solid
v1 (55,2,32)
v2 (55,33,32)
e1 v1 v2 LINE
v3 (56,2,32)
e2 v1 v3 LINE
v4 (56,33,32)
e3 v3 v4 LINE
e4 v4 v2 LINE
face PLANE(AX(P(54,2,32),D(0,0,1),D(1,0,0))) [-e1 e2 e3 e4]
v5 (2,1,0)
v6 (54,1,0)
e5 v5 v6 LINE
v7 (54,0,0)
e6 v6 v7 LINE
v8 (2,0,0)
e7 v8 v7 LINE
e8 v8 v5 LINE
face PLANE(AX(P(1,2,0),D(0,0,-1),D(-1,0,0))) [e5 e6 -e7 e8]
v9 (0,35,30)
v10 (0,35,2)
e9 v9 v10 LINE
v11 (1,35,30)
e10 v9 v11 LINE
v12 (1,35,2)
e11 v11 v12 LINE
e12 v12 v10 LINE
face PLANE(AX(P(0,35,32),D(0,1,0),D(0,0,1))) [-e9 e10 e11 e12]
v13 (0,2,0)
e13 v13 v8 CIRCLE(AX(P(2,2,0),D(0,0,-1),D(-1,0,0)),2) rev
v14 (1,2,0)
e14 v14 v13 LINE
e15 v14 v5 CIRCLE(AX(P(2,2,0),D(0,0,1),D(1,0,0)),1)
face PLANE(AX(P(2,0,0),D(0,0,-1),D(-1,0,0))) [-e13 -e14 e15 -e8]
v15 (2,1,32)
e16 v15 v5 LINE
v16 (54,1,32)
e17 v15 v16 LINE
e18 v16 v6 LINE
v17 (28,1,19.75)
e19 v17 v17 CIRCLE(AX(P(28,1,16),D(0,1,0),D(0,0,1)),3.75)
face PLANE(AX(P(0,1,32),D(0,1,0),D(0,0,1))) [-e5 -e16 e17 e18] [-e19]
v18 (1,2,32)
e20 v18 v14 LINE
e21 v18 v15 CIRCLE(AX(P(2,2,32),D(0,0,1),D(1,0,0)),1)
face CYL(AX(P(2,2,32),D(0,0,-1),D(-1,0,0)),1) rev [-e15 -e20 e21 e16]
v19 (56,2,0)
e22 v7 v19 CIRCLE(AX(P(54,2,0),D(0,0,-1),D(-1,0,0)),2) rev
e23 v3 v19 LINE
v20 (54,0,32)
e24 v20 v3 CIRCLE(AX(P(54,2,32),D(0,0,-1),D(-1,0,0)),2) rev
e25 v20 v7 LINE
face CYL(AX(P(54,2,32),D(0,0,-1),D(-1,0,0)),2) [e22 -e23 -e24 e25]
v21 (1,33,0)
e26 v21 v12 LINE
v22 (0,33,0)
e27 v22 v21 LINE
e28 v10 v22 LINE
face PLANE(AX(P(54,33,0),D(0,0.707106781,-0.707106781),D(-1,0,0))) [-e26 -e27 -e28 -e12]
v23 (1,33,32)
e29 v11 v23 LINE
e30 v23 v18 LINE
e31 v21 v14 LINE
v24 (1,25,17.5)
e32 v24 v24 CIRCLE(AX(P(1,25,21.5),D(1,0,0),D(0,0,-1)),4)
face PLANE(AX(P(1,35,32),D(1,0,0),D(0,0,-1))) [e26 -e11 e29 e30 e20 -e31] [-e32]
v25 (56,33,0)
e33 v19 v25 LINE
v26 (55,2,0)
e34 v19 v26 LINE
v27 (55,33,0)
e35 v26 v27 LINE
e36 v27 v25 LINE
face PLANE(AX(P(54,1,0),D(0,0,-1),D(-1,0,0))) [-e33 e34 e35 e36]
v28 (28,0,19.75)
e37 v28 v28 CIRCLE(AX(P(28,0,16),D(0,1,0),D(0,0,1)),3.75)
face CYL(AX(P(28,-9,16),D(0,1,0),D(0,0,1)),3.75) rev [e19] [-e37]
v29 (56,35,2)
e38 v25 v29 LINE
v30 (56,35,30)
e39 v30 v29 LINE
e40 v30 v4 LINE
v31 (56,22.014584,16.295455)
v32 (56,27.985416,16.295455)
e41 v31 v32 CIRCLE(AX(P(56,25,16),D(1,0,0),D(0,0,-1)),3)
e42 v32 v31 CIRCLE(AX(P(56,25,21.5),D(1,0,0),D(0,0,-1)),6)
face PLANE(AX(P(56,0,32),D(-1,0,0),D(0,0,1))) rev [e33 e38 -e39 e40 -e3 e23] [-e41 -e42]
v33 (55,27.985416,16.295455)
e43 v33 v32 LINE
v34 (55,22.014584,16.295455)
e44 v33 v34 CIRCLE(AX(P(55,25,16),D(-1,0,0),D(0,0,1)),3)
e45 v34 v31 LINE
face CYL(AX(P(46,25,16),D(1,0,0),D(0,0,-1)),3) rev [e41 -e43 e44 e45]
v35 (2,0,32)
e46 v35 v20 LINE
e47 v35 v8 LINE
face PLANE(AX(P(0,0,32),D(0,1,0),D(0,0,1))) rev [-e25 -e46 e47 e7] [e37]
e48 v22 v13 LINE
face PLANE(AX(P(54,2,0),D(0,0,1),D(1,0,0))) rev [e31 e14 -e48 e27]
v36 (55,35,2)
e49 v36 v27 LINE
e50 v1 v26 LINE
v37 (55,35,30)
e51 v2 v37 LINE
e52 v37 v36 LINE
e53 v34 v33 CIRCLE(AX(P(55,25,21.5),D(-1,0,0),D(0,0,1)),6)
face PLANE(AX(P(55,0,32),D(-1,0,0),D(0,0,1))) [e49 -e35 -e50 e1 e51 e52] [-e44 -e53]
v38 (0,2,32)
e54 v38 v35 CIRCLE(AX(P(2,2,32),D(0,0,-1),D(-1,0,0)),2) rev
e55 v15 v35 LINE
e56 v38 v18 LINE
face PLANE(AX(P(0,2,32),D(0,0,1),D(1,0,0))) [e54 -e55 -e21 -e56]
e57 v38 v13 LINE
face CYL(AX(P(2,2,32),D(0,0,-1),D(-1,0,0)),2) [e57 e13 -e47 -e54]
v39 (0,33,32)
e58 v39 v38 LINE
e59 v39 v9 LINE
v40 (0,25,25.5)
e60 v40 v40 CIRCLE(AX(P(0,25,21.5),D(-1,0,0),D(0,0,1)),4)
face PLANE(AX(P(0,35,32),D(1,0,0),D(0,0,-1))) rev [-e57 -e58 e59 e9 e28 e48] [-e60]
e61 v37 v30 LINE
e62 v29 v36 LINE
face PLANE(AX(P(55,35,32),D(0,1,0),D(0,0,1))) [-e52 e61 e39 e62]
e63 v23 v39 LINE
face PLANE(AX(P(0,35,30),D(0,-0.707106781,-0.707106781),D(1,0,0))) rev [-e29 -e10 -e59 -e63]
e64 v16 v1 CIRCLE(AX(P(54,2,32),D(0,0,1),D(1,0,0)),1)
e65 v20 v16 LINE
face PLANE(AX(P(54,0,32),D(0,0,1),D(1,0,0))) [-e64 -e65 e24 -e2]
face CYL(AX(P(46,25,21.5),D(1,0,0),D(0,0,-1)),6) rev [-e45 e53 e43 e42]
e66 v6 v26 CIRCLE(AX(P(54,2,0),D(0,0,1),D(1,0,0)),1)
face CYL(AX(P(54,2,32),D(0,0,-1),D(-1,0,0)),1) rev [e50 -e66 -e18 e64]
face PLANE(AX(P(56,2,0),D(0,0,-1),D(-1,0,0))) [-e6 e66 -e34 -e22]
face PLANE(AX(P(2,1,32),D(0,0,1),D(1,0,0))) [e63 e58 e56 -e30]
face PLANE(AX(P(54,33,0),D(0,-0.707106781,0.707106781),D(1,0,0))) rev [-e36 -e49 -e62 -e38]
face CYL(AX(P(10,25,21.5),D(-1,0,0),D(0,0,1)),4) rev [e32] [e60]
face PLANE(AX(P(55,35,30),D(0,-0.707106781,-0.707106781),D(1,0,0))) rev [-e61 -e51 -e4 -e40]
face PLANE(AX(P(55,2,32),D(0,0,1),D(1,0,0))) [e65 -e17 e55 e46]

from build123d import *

# Parameters (mm, degrees)
BASE_FLANGE1_DEPTH = 32
CUT_EXTRUDE1_DEPTH = 10
SKETCH9_R          = 4
CUT_EXTRUDE2_DEPTH = 10
SKETCH10_R         = 3.75
CUT_EXTRUDE3_DEPTH = 10
CHAMFER2_SIZE      = 2


# Sheet-metal steps are written as plain solids
with BuildPart() as part:
    # Sketch1 → Base-Flange1 (new body)
    with BuildSketch(Plane.XY):
        with BuildLine():
            Line((0, 35), (0, 2))
            ThreePointArc((0, 2), (0.585786438, 0.585786438), (2, 0))
            Line((2, 0), (54, 0))
            ThreePointArc((54, 0), (55.414213562, 0.585786438), (56, 2))
            Line((56, 2), (56, 35))
            Line((56, 35), (55, 35))
            Line((55, 35), (55, 2))
            ThreePointArc((55, 2), (54.707106781, 1.292893219), (54, 1))
            Line((54, 1), (2, 1))
            ThreePointArc((2, 1), (1.292893219, 1.292893219), (1, 2))
            Line((1, 2), (1, 35))
            Line((1, 35), (0, 35))
        make_face()
    extrude(amount=BASE_FLANGE1_DEPTH)

    # Sketch8 → Cut-Extrude1 (cut)
    with BuildSketch(Plane(origin=(56, 0, 0), x_dir=(0, 0, -1), z_dir=(1, 0, 0))):
        with BuildLine():
            ThreePointArc((-16.295454545, 27.985415651), (-27.5, 25), (-16.295454545, 22.014584349))
            ThreePointArc((-16.295454545, 22.014584349), (-13, 25), (-16.295454545, 27.985415651))
        make_face()
    extrude(amount=-CUT_EXTRUDE1_DEPTH, mode=Mode.SUBTRACT)

    # Sketch9 → Cut-Extrude2 (cut)
    with BuildSketch(Plane.ZY):
        with Locations((21.5, 25)):
            Circle(SKETCH9_R)
    extrude(amount=-CUT_EXTRUDE2_DEPTH, mode=Mode.SUBTRACT)

    # Sketch10 → Cut-Extrude3 (cut)
    with BuildSketch(Plane(origin=(0, 1, 0), x_dir=(1, 0, 0), z_dir=(0, 1, 0))):
        with Locations(Location((28, -16, 0), (0, 0, 270))):
            Circle(SKETCH10_R)
    extrude(amount=-CUT_EXTRUDE3_DEPTH, mode=Mode.SUBTRACT)

    # Chamfer2
    chamfer2_edges = [part.edges().sort_by_distance(p)[0] for p in [
        (0.5, 35, 0),
        (55.5, 35, 0),
        (0.5, 35, 32),
        (55.5, 35, 32),
    ]]
    chamfer(chamfer2_edges, length=CHAMFER2_SIZE)


solid = part.part
